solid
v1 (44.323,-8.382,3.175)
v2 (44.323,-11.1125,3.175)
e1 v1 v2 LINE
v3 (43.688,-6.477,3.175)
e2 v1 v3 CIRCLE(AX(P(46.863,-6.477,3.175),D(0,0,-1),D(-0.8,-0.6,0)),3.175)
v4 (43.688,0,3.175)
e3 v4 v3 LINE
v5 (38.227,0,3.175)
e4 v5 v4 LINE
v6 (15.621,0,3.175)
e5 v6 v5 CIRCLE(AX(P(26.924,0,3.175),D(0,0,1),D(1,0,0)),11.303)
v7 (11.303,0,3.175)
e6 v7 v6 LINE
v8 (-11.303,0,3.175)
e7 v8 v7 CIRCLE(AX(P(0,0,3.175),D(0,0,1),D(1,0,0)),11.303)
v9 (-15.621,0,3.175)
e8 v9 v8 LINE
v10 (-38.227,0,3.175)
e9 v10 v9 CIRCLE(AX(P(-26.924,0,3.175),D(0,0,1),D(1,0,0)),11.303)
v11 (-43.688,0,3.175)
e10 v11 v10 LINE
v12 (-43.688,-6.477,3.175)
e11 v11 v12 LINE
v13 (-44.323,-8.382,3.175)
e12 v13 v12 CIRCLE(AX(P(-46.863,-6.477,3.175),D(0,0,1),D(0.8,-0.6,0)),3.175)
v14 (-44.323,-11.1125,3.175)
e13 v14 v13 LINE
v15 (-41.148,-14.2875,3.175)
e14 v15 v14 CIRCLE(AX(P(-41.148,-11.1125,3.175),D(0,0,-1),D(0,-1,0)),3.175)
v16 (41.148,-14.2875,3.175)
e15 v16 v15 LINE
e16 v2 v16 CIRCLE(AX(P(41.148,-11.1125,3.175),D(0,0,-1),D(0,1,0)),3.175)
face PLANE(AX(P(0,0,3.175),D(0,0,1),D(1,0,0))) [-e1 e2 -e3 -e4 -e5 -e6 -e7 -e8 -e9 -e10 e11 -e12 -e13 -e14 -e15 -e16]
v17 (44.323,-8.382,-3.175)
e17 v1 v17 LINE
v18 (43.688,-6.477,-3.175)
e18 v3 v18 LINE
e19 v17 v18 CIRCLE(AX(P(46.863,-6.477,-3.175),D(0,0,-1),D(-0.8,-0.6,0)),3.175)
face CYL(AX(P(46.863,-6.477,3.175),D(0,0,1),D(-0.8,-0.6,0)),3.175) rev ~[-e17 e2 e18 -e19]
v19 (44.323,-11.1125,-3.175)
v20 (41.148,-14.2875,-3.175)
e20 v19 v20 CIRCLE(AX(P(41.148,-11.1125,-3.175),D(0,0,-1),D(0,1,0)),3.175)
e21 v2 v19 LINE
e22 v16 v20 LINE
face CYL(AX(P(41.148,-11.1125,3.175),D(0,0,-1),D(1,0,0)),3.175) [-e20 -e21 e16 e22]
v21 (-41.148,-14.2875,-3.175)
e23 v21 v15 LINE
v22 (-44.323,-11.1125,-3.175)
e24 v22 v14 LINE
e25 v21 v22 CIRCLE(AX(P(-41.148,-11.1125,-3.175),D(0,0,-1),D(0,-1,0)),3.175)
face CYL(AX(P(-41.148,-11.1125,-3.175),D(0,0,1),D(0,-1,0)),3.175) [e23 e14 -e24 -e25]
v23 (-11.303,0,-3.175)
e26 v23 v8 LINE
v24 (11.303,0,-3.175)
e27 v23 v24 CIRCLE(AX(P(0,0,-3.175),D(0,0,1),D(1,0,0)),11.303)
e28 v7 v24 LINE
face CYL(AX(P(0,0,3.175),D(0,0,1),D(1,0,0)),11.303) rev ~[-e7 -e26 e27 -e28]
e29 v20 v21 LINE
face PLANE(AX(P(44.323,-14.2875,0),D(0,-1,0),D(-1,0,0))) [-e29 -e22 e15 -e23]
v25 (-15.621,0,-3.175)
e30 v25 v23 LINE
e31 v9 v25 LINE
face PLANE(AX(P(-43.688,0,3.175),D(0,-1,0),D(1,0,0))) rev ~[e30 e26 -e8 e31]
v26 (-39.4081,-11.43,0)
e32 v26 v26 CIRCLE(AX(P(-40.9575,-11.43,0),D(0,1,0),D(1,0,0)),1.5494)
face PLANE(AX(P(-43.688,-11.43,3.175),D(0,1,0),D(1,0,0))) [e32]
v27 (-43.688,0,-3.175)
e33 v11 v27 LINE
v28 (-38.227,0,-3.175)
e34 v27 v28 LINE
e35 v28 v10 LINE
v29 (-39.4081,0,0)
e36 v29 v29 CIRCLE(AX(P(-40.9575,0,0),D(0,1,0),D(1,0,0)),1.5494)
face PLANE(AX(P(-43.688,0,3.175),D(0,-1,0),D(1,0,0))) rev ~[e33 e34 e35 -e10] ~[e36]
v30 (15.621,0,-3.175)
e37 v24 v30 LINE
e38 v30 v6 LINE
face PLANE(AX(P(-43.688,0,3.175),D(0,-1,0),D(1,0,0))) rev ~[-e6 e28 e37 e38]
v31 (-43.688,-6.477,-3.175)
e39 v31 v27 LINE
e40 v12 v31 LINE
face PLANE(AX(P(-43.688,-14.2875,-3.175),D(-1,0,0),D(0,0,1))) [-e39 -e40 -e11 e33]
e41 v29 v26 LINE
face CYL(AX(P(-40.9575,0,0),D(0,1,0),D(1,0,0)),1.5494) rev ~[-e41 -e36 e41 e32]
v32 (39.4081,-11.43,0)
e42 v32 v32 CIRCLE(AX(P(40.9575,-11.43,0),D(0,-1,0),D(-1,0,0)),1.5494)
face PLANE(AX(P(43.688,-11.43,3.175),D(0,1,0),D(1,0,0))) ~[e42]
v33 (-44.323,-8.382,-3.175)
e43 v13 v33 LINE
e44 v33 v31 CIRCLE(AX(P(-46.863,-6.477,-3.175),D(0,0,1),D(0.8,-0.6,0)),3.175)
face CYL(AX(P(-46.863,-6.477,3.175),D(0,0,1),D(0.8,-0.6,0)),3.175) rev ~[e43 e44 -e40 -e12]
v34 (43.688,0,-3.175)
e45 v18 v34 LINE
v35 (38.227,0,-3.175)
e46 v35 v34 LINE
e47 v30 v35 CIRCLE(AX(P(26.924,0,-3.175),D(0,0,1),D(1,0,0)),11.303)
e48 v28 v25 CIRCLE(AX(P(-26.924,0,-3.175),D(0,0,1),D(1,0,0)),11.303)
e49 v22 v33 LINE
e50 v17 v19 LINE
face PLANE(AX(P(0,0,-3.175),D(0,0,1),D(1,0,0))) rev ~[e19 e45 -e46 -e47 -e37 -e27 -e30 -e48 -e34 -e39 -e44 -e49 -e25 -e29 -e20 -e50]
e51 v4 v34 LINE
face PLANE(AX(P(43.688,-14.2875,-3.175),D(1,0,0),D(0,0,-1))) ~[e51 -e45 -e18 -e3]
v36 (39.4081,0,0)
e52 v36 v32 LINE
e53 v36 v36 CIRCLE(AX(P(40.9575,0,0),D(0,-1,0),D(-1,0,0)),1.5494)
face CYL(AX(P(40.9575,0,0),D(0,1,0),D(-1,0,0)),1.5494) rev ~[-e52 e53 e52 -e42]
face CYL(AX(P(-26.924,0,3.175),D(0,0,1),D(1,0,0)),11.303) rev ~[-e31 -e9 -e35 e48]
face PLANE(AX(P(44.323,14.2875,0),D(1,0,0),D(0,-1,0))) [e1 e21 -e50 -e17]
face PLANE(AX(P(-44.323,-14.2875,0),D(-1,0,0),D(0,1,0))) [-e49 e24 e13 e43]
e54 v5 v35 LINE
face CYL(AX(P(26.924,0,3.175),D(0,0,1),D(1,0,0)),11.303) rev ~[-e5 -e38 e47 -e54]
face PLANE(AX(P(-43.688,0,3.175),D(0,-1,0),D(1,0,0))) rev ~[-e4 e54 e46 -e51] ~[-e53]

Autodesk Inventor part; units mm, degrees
ref_plane "YZ Plane" through (0, 0, 0) normal (1, 0, 0) x (0, 1, 0)
ref_plane "XZ Plane" through (0, 0, 0) normal (0, 1, 0) x (-1, 0, 0)
ref_plane "XY Plane" through (0, 0, 0) normal (0, 0, 1) x (1, 0, 0)
sketch "Sketch1" plane through (0, 0, 0) normal (0, 0, 1) x (1, 0, 0)
  line L0 (-44.323, 14.2875) -> (44.323, 14.2875)
  line L1 (44.323, 14.2875) -> (44.323, -14.2875)
  line L2 (44.323, -14.2875) -> (-44.323, -14.2875)
  line L3 (-44.323, -14.2875) -> (-44.323, 14.2875)
  point P0 (0, 0)
  dimension "d0" = 88.646
  dimension "d1" = 44.323
  dimension "d2" = 14.2875
  dimension "d3" = 28.575
extrude "Extrusion1" add sketch "Sketch1" along normal mid plane 6.35
sketch "Sketch2" plane through (0, 0, 3.175) normal (0, 0, 1) x (1, 0, 0)
  circle A0 centre (-26.924, 0) radius 11.303
  circle A1 centre (0, 0) radius 11.303
  line L0 (44.323, -14.2875) -> (44.323, 14.2875) projected
  circle A2 centre (26.924, 0) radius 11.303
  line L1 (-44.323, 14.2875) -> (-44.323, -14.2875) projected
  line L2 (-44.323, 0) -> (44.323, 0) construction
  line L3 (44.323, 14.2875) -> (-44.323, 14.2875) projected
  point P0 (0, 0)
  dimension "d6" = 22.606
  dimension "d9" = 22.606
  dimension "d11" = 22.606
  dimension "d14" = 26.924
  dimension "d21" = 88.646
  dimension "d22" = 26.924
  dimension "d50" = 0
sketch "Sketch4" plane through (-44.323, -14.2875, -3.175) normal (-1, 0, 0) x (0, 0, 1)
  line L0 (0, 0) -> (0, 28.575) projected
  line L1 (6.35, 28.575) -> (6.35, 0) projected
  line L2 (0, 22.6695) -> (6.35, 22.6695)
  line L3 (6.35, 22.6695) -> (6.35, 5.9055)
  line L4 (6.35, 5.9055) -> (0, 5.9055)
  line L5 (0, 5.9055) -> (0, 22.6695)
  point P0 (3.175, 14.2875)
  dimension "d30" = 8.382
  dimension "d31" = 16.764
extrude "Extrusion3" cut sketch "Sketch4" against normal blind 0.635
mirror "Mirror1" about plane through (0, 0, 0) normal (1, 0, 0) of "Extrusion3"
sketch "Sketch7" plane through (-44.323, -14.2875, 3.175) normal (0, -1, 0) x (1, 0, 0)
  line L0 (30.353, -14.605) -> (58.293, -14.605)
  line L1 (58.293, -14.605) -> (58.293, 8.255)
  line L2 (58.293, 8.255) -> (30.353, 8.255)
  line L3 (30.353, 8.255) -> (30.353, -14.605)
  point P0 (44.323, -3.175)
  dimension "d39" = 27.94
  dimension "d40" = 22.86
  dimension "d41" = 11.43
  dimension "d42" = 13.97
extrude "Extrusion5" [suppressed]
sketch "Sketch8" plane through (0, 0, -3.175) normal (0, 0, -1) x (-1, 0, 0)
  line L0 (-44.323, 14.2875) -> (44.323, 14.2875) projected
  line L1 (15.6718, 14.2875) -> (-15.6718, 14.2875)
  line L2 (-15.6718, 14.2875) -> (-15.6718, 52.3875)
  line L3 (-15.6718, 52.3875) -> (15.6718, 52.3875)
  line L4 (15.6718, 52.3875) -> (15.6718, 14.2875)
  point P0 (0, 0)
  dimension "d45" = 31.3436
  dimension "d46" = 38.1
  dimension "d47" = 15.6718
extrude "Extrusion6" add sketch "Sketch8" against normal up to surface (6.35 mm away)
extrude "Extrusion7" cut sketch "Sketch2" against normal blind 25.4
sketch "Sketch9" plane through (-15.6718, 52.3875, -3.175) normal (0, 1, 0) x (1, 0, 0)
  line L0 (-28.6512, -6.35) -> (59.9948, -6.35) projected
  line L1 (3.1718, -6.35) -> (28.1718, -6.35)
  line L2 (28.1718, -6.35) -> (28.1718, -3.175)
  line L3 (28.1718, -3.175) -> (3.1718, -3.175)
  line L4 (3.1718, -3.175) -> (3.1718, -6.35)
  point P0 (15.6718, -3.175)
  dimension "d64" = 3.175
  dimension "d65" = 25
  dimension "d66" = 12.5
extrude "Extrusion8" cut sketch "Sketch9" against normal blind 0.9
sketch "Sketch13" plane through (0, 0, 3.175) normal (0, 0, 1) x (1, 0, 0)
  line L0 (-15.6718, 52.3875) -> (-12.5, 52.3875) projected
  line L1 (-12.5, 52.3875) -> (12.5, 52.3875) projected
  line L2 (12.5, 52.3875) -> (15.6718, 52.3875) projected
  line L3 (15.6718, 52.3875) -> (15.6718, 14.2875) projected
  line L4 (-15.6718, 14.2875) -> (-15.6718, 52.3875) projected
  line L5 (-15.6718, 14.2875) -> (-44.323, 14.2875) projected
  line L6 (44.323, 14.2875) -> (15.6718, 14.2875) projected
  line L7 (44.323, 8.382) -> (44.323, 14.2875) projected
  line L8 (-44.323, 14.2875) -> (-44.323, 8.382) projected
  line L9 (-44.323, 8.382) -> (-43.688, 8.382) projected
  line L10 (43.688, 8.382) -> (44.323, 8.382) projected
  line L11 (-43.688, 8.382) -> (-43.688, 0)
  line L12 (-43.688, 8.382) -> (-43.688, -8.382) projected
  line L13 (-43.688, 0) -> (43.688, 0)
  line L14 (43.688, 8.382) -> (43.688, -8.382) projected
  line L15 (43.688, 0) -> (43.688, 8.382)
  point P0 (0, 0)
extrude "Extrusion11" cut sketch "Sketch13" against normal through all
sketch "Sketch14" plane through (-43.688, 0, 3.175) normal (0, 1, 0) x (1, 0, 0)
  line L0 (5.461, 6.35) -> (5.461, 0) projected
  line L1 (0, 6.35) -> (5.461, 6.35) projected
  line L2 (0, 0) -> (0, 6.35) projected
  line L3 (5.461, 0) -> (0, 0) projected
  circle A0 centre (2.7305, 3.175) radius 1.5494
  point P0 (43.688, 3.175)
  dimension "d84" = 3.0988
  dimension "d85" = 5.461
  dimension "d87" = 3.175
  dimension "d88" = 2.7305
  dimension "d98" = 6.35
extrude "Extrusion12" cut sketch "Sketch14" against normal blind 11.43 contours A0
mirror "Mirror3" about plane through (0, 0, 0) normal (1, 0, 0) of "Extrusion12"
thread "Thread3" size "5-40 UNC" class "2B" standard "ANSI Unified Screw Threads" full length
thread "Thread4" size "5-40 UNC" class "2B" standard "ANSI Unified Screw Threads" full length
fillet "Fillet1" radius 3.175 2 edges at (44.323, -14.2875, 0) (-44.323, -14.2875, 0)
fillet "Fillet3" radius 3.175 2 edges at (-43.688, -8.382, 0) (43.688, -8.382, 0)
equation "\"d1\" = 0.5 * d0"
equation "\"d2\" = 0.5 * d3"
equation "\"d9\" = d7"
equation "\"d11\" = d9"
equation "\"d22\" = d14"
equation "\"d30\" = 0.5 * d31"
equation "\"d41\" = 0.5 * d40"
equation "\"d42\" = 0.5 * d39"
equation "\"d47\" = 0.5 * d45"
equation "\"d66\" = 0.5 * d65"
equation "\"d87\" = 0.5 * d98"
equation "\"d88\" = 0.5 * d85"
equation "\"d7\" = d6"
properties part number "Tube Holder Halve 3" material "Aluminum 6061-AHC"
